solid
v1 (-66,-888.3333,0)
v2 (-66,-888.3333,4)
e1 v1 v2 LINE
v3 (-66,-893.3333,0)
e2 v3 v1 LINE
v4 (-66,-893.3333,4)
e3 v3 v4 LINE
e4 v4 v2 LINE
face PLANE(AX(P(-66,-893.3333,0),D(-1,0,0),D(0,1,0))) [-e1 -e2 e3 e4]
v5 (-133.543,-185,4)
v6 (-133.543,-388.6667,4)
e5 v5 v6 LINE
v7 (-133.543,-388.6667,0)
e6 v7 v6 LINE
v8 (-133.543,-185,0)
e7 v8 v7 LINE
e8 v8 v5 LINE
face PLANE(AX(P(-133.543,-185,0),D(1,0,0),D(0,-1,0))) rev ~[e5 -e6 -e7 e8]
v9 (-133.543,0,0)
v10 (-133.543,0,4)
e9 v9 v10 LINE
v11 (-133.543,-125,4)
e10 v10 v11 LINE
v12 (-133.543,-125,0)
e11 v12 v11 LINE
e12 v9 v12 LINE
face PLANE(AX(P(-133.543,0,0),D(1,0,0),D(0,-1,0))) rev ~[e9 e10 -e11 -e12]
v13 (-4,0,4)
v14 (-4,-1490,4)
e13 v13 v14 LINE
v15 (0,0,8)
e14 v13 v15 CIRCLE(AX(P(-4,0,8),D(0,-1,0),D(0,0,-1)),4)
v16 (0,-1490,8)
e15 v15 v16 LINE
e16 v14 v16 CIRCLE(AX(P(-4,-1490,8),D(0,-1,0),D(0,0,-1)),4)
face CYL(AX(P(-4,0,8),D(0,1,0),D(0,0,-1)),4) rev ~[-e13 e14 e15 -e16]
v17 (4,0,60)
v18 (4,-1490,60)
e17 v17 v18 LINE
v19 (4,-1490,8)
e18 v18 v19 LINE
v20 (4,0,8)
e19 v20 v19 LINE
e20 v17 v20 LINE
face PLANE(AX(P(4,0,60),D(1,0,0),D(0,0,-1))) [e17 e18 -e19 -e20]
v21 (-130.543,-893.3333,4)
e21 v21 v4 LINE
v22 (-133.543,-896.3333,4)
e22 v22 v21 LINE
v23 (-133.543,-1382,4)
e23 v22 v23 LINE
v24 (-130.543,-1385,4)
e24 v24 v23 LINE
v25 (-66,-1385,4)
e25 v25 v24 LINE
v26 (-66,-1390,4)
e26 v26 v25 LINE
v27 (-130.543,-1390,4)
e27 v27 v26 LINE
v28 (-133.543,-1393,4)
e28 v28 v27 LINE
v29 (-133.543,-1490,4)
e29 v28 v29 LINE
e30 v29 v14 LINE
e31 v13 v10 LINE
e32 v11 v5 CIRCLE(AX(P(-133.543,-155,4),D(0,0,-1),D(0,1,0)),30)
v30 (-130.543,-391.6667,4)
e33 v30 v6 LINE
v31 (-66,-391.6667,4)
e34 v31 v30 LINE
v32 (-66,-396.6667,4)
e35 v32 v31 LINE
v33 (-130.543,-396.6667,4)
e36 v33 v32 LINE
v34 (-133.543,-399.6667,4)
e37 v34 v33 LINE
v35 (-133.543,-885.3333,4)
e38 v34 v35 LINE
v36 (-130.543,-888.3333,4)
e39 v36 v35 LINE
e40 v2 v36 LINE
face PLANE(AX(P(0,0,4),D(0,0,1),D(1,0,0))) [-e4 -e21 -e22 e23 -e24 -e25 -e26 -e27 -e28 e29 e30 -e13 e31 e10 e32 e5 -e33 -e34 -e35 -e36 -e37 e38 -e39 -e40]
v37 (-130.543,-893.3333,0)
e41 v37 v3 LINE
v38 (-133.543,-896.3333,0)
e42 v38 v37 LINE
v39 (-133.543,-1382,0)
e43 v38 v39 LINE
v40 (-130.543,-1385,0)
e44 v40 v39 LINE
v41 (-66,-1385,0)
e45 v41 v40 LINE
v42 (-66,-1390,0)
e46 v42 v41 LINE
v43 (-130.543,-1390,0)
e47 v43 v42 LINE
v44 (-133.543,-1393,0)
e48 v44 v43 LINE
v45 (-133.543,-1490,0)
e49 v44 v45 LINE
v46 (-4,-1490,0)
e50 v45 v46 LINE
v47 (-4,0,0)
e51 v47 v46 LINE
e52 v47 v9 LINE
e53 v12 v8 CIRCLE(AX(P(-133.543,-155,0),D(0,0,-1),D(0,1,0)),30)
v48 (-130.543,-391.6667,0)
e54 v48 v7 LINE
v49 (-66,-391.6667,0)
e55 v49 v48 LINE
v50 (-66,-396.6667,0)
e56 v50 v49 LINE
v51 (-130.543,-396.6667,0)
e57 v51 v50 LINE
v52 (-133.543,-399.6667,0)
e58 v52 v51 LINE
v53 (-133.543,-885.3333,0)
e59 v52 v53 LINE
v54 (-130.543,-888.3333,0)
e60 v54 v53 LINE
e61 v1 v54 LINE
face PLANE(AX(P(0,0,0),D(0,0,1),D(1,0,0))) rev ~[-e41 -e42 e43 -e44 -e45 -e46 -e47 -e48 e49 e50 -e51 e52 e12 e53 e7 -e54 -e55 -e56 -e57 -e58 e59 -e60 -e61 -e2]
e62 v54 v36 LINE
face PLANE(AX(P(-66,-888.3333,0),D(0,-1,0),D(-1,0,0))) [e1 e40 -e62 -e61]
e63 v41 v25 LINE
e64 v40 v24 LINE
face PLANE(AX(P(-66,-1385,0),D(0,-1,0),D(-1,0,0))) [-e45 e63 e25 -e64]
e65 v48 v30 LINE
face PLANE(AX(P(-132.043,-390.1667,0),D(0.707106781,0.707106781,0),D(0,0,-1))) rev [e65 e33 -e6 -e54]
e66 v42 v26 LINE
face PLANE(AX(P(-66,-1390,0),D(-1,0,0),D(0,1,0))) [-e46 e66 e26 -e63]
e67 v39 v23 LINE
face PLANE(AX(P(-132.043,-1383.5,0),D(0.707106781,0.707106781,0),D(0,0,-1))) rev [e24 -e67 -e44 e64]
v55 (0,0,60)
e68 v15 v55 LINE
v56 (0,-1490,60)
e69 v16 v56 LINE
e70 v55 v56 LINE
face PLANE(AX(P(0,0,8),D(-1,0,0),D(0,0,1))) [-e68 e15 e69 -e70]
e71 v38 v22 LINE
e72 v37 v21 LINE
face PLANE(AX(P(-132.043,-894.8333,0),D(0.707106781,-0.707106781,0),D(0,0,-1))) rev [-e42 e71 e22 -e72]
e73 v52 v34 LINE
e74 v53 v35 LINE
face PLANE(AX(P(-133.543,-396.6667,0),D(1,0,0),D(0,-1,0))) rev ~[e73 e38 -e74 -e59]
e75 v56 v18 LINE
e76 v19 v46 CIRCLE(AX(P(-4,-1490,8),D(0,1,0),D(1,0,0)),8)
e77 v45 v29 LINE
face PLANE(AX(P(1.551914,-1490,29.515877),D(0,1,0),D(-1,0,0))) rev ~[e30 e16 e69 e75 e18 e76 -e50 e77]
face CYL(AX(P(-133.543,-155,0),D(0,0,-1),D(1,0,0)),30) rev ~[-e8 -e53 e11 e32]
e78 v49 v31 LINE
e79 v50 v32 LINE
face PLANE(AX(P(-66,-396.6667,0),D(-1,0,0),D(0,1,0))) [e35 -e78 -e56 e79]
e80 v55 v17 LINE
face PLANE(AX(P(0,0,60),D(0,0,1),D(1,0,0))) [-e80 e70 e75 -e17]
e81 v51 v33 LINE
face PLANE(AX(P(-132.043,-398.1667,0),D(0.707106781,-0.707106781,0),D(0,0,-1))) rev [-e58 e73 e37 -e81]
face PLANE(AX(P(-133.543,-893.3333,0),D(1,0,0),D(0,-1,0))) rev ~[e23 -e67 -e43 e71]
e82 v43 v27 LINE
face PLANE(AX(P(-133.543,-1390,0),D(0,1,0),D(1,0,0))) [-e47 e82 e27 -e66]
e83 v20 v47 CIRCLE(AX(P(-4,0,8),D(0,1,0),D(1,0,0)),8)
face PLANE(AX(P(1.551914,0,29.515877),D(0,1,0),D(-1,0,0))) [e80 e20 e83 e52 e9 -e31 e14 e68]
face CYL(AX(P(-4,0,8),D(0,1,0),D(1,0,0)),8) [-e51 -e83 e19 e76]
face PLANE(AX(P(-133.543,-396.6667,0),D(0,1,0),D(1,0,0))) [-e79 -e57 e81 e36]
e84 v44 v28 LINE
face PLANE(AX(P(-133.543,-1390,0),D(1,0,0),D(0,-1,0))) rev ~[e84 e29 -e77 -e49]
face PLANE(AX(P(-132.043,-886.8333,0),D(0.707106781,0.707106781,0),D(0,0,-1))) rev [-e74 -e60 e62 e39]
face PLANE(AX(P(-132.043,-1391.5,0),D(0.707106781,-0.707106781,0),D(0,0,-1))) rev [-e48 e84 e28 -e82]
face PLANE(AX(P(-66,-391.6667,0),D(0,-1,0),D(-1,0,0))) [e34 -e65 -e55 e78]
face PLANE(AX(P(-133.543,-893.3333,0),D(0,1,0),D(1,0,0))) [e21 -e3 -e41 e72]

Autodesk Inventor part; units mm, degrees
ref_plane "YZ Plane" through (0, 0, 0) normal (1, 0, 0) x (0, 1, 0)
ref_plane "XZ Plane" through (0, 0, 0) normal (0, 1, 0) x (-1, 0, 0)
ref_plane "XY Plane" through (0, 0, 0) normal (0, 0, 1) x (1, 0, 0)
sketch "Sketch1" plane through (0, 0, 0) normal (0, 0, 1) x (1, 0, 0)
  line L0 (0, 0) -> (-133.543, 0)
  line L1 (-133.543, 0) -> (-133.543, -1490)
  line L2 (-133.543, -1490) -> (0, -1490)
  line L3 (0, -1490) -> (0, 0)
  line L4 (-133.543, -1390) -> (-66, -1390)
  line L5 (-66, -1390) -> (-66, -1385)
  line L6 (-66, -1385) -> (-133.543, -1385)
  line L7 (-133.543, -1385) -> (-133.543, -1390)
  line L8 (-133.543, -893.3333) -> (-66, -893.3333)
  line L9 (-66, -893.3333) -> (-66, -888.3333)
  line L10 (-66, -888.3333) -> (-133.543, -888.3333)
  line L11 (-133.543, -888.3333) -> (-133.543, -893.3333)
  line L12 (-133.543, -396.6667) -> (-66, -396.6667)
  line L13 (-66, -396.6667) -> (-66, -391.6667)
  line L14 (-66, -391.6667) -> (-133.543, -391.6667)
  line L15 (-133.543, -391.6667) -> (-133.543, -396.6667)
  circle A0 centre (-133.543, -155) radius 30
  point P0 (-133.543, -391.6667)
  point P1 (-133.543, -125)
  point P2 (-133.543, -185)
  dimension "d0" = 1490
  dimension "d1" = 133.543
  dimension "d2" = 5
  dimension "d4" = 100
  dimension "d7" = 496.6667
  dimension "d23" = 66
  dimension "d28" = 60
  dimension "d29" = 1335
extrude "Plate1" add sketch "Sketch1" along normal blind 4 contours L3 L2 L1 L4 L5 L6 L8 L9 L10 L12 L13 L14 A0 L0
sketch "Sketch2" plane through (4, 0, 0) normal (-1, 0, 0) x (0, -1, 0)
  line L0 (1490, 0) -> (0, 0)
  line L1 (0, 0) -> (0, 60)
  line L2 (0, 60) -> (1490, 60)
  line L3 (1490, 60) -> (1490, 0)
edge flange "Flange1" height 60 angle 90 thickness 4 bend radius 4 thickness toward (-1, 0, 0) relief tear relief width 4 relief depth 2 edges at (0, -745, 4) wall of the first edge with corners at (4, -1490, 0) (4, 0, 0) (4, 0, 60) (4, -1490, 60)
bend "Bend1"
corner "Corner1"
chamfer "Corner Chamfer1" distance 3 angle 45 6 edges at (-133.543, -1390, 2) (-133.543, -1385, 2) (-133.543, -893.3333, 2) (-133.543, -888.3333, 2) (-133.543, -391.6667, 2) (-133.543, -396.6667, 2)
equation "\"d0\" = Стрингер_длина"
equation "\"d1\" = стрингер_глубина_6"
equation "\"d2\" = паз_под_стрингер_толщина"
equation "\"d7\" = 0.333333 * Стрингер_длина"
equation "\"d23\" = паз_под_стрингер_глубина - Thickness"
equation "\"d28\" = 2 * радиус_выреза_под_сварку"
equation "\"d12\" = Thickness"
equation "\"d13\" = BendReliefWidth"
equation "\"d14\" = BendReliefDepth"
equation "\"d15\" = MinimumRemnant"
equation "\"d16\" = TransitionRadius"
equation "\"d17\" = ребро_усилителей"
equation "\"d19\" = BendRadius"
equation "\"d20\" = CornerReliefSize"
equation "\"d21\" = GapSize"
equation "\"d22\" = JacobiRadiusSize"
equation "\"BendRadius\" = Thickness"
equation "\"BendReliefWidth\" = Thickness"
equation "\"BendReliefDepth\" = 0.5 * Thickness"
equation "\"CornerReliefSize\" = 4 * Thickness"
equation "\"MinimumRemnant\" = 2 * Thickness"
equation "\"TransitionRadius\" = BendRadius"
equation "\"JacobiRadiusSize\" = BendRadius"
equation "\"GapSize\" = Thickness"
equation "\"Стрингер_длина\" = 1490"
equation "\"стрингер_глубина_6\" = 133.543003"
equation "\"паз_под_стрингер_толщина\" = 5"
equation "\"паз_под_стрингер_глубина\" = 70"
equation "\"Thickness\" = 4"
equation "\"радиус_выреза_под_сварку\" = 30"
equation "\"ребро_усилителей\" = 60"
properties part number "GBK 1214 stringer 6" material "Steel"
